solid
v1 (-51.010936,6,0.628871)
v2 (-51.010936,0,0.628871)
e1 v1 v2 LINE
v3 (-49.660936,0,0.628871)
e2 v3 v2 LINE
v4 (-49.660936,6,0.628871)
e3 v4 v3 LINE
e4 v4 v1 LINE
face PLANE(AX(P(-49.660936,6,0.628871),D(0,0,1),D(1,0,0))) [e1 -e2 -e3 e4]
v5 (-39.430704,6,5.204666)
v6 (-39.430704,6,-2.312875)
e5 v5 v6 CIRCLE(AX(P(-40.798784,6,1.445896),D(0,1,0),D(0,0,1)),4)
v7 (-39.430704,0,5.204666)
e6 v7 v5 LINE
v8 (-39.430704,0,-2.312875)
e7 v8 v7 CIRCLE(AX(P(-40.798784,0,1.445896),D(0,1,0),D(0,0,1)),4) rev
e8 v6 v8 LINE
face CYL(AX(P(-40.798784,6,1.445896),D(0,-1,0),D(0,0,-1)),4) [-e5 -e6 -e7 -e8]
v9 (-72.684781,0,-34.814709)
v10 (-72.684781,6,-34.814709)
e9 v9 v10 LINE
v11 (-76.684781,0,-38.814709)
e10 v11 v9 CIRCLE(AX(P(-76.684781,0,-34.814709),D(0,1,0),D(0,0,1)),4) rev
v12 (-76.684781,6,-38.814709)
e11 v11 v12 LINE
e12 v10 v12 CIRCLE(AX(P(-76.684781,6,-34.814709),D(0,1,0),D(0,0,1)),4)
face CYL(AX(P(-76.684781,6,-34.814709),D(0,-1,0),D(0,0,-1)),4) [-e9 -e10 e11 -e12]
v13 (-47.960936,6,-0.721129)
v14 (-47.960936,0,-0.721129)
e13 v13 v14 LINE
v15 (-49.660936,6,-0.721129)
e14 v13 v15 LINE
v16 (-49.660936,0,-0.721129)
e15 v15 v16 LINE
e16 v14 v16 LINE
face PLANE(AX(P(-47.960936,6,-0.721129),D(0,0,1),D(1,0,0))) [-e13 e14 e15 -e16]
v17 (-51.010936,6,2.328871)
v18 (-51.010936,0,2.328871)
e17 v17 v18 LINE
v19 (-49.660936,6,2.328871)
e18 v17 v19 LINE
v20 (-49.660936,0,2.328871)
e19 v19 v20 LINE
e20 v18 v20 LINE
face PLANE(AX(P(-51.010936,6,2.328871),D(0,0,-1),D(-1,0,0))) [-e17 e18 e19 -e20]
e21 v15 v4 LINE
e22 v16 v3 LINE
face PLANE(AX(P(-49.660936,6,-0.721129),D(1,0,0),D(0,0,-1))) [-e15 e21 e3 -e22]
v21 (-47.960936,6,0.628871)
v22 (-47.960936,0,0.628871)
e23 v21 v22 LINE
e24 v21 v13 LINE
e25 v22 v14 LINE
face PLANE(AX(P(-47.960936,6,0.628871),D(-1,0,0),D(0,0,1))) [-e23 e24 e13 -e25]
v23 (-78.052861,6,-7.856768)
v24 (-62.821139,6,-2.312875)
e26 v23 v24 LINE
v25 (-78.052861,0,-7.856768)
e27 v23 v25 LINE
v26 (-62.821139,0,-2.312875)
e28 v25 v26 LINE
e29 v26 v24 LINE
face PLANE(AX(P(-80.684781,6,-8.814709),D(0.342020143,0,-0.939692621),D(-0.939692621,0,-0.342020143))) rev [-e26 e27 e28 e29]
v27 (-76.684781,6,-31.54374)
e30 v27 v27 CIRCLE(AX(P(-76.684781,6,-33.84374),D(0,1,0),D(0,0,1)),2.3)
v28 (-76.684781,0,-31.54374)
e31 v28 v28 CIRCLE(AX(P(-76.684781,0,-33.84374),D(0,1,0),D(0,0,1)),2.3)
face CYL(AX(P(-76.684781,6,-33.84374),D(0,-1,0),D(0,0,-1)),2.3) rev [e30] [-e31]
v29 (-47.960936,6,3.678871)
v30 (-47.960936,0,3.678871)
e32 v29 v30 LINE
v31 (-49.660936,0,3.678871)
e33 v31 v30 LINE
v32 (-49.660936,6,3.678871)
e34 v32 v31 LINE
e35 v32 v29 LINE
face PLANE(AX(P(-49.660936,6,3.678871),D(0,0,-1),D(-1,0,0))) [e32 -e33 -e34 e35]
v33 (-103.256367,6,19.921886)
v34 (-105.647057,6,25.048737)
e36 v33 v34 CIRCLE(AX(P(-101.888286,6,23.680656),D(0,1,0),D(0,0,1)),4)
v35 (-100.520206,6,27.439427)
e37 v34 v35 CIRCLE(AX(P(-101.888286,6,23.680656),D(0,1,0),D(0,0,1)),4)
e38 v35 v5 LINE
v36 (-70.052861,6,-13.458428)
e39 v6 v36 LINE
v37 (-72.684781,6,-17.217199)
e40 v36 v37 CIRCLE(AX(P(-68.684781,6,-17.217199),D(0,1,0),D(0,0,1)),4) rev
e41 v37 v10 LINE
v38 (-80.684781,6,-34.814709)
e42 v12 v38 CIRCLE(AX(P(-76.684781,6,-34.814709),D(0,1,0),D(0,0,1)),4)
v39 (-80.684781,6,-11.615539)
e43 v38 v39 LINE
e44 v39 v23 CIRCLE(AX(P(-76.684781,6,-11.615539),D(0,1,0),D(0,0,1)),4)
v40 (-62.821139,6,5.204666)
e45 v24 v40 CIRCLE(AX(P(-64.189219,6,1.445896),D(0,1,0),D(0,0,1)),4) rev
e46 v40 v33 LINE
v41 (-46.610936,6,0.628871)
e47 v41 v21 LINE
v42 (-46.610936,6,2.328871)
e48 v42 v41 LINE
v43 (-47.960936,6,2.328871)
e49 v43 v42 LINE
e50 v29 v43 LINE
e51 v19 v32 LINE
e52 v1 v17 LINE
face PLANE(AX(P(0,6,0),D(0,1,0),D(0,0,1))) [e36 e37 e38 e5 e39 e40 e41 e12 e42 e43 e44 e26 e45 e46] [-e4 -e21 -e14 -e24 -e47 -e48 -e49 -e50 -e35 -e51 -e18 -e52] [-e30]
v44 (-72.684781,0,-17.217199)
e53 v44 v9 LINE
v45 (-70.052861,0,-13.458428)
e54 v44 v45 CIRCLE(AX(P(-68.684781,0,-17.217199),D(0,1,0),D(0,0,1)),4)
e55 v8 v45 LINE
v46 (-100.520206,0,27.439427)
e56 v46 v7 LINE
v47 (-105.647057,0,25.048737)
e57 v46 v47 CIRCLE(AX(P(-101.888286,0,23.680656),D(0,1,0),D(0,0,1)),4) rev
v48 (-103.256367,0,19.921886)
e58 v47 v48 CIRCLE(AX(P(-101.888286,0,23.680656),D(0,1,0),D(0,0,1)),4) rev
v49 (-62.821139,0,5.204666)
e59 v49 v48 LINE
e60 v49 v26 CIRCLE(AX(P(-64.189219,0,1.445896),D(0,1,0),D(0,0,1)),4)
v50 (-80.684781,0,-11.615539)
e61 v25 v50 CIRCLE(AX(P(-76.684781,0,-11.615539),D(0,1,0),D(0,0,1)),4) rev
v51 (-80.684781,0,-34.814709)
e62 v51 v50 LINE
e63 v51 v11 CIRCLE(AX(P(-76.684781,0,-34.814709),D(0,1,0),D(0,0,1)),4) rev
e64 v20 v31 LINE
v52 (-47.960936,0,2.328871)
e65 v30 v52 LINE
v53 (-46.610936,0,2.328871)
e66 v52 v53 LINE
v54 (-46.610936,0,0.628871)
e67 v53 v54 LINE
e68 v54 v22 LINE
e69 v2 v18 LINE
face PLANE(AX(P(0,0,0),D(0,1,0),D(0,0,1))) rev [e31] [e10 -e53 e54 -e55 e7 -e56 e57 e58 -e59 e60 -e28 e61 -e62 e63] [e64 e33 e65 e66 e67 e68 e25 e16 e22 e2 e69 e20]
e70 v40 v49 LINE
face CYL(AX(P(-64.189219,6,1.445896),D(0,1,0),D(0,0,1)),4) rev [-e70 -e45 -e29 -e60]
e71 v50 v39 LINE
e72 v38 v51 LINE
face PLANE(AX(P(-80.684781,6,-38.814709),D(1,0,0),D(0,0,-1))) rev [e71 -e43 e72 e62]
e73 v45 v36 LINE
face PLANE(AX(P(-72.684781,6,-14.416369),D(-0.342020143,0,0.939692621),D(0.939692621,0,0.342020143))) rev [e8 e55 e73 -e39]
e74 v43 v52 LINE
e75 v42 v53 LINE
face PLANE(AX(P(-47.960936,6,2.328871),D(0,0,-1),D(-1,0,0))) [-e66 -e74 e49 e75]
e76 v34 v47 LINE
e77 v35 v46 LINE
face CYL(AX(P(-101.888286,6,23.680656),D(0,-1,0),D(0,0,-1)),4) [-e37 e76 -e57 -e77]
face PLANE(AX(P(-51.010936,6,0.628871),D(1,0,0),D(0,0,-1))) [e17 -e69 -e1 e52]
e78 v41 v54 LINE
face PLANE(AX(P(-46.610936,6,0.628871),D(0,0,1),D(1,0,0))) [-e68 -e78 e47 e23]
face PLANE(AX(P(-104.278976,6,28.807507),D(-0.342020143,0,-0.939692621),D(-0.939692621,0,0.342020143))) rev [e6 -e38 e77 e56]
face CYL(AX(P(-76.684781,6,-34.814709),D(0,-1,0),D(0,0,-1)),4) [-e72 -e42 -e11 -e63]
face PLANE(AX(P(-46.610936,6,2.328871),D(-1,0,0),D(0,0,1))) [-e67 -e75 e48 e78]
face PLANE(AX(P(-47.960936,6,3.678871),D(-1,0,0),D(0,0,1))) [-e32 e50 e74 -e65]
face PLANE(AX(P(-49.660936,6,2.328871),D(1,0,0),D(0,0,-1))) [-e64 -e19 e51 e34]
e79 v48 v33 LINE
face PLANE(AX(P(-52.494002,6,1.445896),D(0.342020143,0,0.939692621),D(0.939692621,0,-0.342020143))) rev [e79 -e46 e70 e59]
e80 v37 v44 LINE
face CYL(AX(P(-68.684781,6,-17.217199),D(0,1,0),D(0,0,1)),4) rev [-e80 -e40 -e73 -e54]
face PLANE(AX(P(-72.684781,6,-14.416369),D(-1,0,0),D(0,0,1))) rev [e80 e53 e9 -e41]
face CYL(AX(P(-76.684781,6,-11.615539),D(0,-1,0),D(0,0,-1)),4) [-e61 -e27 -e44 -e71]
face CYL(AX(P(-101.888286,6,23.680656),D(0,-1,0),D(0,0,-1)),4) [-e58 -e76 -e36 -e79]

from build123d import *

# Parameters (mm, degrees)
SKETCH1_R           = 2.3
BOSS_EXTRUDE1_DEPTH = 6
FILLET1_R           = 4


with BuildPart() as part:
    # Sketch1 → Boss-Extrude1 (new body)
    with BuildSketch(Plane(origin=(0, 0, 0), x_dir=(1, 0, 0), z_dir=(0, 1, 0))):
        Polygon((-80.684780516, 38.81470852), (-80.684780516, 8.81470852), (-52.494001892, -1.44589578), (-107.0151375, -21.289966279), (-104.278976354, -28.807507246), (-29.103566691, -1.44589578), (-72.684780516, 14.416368826), (-72.684780516, 38.81470852), align=None)
        with Locations(Location((-76.684780516, 33.843739542, 0), (0, 0, 270))):
            Circle(SKETCH1_R, mode=Mode.SUBTRACT)
        Polygon((-51.010936087, -0.6288713), (-51.010936087, -2.3288713), (-49.660936087, -2.3288713), (-49.660936087, -3.6788713), (-47.960936087, -3.6788713), (-47.960936087, -2.3288713), (-46.610936087, -2.3288713), (-46.610936087, -0.6288713), (-47.960936087, -0.6288713), (-47.960936087, 0.7211287), (-49.660936087, 0.7211287), (-49.660936087, -0.6288713), align=None, mode=Mode.SUBTRACT)
    extrude(amount=BOSS_EXTRUDE1_DEPTH)

    # Fillet1
    fillet1_edges = [part.edges().sort_by_distance(p)[0] for p in [
        (-72.684780516, 3, -14.416368826),
        (-80.684780516, 3, -8.81470852),
        (-104.278976354, 3, 28.807507246),
        (-107.0151375, 3, 21.289966279),
        (-52.494001892, 3, 1.44589578),
        (-29.103566691, 3, 1.44589578),
        (-72.684780516, 3, -38.81470852),
        (-80.684780516, 3, -38.81470852),
    ]]
    fillet(fillet1_edges, radius=FILLET1_R - 0.0001)  # a hair under: the kernel refuses the full size


solid = part.part
